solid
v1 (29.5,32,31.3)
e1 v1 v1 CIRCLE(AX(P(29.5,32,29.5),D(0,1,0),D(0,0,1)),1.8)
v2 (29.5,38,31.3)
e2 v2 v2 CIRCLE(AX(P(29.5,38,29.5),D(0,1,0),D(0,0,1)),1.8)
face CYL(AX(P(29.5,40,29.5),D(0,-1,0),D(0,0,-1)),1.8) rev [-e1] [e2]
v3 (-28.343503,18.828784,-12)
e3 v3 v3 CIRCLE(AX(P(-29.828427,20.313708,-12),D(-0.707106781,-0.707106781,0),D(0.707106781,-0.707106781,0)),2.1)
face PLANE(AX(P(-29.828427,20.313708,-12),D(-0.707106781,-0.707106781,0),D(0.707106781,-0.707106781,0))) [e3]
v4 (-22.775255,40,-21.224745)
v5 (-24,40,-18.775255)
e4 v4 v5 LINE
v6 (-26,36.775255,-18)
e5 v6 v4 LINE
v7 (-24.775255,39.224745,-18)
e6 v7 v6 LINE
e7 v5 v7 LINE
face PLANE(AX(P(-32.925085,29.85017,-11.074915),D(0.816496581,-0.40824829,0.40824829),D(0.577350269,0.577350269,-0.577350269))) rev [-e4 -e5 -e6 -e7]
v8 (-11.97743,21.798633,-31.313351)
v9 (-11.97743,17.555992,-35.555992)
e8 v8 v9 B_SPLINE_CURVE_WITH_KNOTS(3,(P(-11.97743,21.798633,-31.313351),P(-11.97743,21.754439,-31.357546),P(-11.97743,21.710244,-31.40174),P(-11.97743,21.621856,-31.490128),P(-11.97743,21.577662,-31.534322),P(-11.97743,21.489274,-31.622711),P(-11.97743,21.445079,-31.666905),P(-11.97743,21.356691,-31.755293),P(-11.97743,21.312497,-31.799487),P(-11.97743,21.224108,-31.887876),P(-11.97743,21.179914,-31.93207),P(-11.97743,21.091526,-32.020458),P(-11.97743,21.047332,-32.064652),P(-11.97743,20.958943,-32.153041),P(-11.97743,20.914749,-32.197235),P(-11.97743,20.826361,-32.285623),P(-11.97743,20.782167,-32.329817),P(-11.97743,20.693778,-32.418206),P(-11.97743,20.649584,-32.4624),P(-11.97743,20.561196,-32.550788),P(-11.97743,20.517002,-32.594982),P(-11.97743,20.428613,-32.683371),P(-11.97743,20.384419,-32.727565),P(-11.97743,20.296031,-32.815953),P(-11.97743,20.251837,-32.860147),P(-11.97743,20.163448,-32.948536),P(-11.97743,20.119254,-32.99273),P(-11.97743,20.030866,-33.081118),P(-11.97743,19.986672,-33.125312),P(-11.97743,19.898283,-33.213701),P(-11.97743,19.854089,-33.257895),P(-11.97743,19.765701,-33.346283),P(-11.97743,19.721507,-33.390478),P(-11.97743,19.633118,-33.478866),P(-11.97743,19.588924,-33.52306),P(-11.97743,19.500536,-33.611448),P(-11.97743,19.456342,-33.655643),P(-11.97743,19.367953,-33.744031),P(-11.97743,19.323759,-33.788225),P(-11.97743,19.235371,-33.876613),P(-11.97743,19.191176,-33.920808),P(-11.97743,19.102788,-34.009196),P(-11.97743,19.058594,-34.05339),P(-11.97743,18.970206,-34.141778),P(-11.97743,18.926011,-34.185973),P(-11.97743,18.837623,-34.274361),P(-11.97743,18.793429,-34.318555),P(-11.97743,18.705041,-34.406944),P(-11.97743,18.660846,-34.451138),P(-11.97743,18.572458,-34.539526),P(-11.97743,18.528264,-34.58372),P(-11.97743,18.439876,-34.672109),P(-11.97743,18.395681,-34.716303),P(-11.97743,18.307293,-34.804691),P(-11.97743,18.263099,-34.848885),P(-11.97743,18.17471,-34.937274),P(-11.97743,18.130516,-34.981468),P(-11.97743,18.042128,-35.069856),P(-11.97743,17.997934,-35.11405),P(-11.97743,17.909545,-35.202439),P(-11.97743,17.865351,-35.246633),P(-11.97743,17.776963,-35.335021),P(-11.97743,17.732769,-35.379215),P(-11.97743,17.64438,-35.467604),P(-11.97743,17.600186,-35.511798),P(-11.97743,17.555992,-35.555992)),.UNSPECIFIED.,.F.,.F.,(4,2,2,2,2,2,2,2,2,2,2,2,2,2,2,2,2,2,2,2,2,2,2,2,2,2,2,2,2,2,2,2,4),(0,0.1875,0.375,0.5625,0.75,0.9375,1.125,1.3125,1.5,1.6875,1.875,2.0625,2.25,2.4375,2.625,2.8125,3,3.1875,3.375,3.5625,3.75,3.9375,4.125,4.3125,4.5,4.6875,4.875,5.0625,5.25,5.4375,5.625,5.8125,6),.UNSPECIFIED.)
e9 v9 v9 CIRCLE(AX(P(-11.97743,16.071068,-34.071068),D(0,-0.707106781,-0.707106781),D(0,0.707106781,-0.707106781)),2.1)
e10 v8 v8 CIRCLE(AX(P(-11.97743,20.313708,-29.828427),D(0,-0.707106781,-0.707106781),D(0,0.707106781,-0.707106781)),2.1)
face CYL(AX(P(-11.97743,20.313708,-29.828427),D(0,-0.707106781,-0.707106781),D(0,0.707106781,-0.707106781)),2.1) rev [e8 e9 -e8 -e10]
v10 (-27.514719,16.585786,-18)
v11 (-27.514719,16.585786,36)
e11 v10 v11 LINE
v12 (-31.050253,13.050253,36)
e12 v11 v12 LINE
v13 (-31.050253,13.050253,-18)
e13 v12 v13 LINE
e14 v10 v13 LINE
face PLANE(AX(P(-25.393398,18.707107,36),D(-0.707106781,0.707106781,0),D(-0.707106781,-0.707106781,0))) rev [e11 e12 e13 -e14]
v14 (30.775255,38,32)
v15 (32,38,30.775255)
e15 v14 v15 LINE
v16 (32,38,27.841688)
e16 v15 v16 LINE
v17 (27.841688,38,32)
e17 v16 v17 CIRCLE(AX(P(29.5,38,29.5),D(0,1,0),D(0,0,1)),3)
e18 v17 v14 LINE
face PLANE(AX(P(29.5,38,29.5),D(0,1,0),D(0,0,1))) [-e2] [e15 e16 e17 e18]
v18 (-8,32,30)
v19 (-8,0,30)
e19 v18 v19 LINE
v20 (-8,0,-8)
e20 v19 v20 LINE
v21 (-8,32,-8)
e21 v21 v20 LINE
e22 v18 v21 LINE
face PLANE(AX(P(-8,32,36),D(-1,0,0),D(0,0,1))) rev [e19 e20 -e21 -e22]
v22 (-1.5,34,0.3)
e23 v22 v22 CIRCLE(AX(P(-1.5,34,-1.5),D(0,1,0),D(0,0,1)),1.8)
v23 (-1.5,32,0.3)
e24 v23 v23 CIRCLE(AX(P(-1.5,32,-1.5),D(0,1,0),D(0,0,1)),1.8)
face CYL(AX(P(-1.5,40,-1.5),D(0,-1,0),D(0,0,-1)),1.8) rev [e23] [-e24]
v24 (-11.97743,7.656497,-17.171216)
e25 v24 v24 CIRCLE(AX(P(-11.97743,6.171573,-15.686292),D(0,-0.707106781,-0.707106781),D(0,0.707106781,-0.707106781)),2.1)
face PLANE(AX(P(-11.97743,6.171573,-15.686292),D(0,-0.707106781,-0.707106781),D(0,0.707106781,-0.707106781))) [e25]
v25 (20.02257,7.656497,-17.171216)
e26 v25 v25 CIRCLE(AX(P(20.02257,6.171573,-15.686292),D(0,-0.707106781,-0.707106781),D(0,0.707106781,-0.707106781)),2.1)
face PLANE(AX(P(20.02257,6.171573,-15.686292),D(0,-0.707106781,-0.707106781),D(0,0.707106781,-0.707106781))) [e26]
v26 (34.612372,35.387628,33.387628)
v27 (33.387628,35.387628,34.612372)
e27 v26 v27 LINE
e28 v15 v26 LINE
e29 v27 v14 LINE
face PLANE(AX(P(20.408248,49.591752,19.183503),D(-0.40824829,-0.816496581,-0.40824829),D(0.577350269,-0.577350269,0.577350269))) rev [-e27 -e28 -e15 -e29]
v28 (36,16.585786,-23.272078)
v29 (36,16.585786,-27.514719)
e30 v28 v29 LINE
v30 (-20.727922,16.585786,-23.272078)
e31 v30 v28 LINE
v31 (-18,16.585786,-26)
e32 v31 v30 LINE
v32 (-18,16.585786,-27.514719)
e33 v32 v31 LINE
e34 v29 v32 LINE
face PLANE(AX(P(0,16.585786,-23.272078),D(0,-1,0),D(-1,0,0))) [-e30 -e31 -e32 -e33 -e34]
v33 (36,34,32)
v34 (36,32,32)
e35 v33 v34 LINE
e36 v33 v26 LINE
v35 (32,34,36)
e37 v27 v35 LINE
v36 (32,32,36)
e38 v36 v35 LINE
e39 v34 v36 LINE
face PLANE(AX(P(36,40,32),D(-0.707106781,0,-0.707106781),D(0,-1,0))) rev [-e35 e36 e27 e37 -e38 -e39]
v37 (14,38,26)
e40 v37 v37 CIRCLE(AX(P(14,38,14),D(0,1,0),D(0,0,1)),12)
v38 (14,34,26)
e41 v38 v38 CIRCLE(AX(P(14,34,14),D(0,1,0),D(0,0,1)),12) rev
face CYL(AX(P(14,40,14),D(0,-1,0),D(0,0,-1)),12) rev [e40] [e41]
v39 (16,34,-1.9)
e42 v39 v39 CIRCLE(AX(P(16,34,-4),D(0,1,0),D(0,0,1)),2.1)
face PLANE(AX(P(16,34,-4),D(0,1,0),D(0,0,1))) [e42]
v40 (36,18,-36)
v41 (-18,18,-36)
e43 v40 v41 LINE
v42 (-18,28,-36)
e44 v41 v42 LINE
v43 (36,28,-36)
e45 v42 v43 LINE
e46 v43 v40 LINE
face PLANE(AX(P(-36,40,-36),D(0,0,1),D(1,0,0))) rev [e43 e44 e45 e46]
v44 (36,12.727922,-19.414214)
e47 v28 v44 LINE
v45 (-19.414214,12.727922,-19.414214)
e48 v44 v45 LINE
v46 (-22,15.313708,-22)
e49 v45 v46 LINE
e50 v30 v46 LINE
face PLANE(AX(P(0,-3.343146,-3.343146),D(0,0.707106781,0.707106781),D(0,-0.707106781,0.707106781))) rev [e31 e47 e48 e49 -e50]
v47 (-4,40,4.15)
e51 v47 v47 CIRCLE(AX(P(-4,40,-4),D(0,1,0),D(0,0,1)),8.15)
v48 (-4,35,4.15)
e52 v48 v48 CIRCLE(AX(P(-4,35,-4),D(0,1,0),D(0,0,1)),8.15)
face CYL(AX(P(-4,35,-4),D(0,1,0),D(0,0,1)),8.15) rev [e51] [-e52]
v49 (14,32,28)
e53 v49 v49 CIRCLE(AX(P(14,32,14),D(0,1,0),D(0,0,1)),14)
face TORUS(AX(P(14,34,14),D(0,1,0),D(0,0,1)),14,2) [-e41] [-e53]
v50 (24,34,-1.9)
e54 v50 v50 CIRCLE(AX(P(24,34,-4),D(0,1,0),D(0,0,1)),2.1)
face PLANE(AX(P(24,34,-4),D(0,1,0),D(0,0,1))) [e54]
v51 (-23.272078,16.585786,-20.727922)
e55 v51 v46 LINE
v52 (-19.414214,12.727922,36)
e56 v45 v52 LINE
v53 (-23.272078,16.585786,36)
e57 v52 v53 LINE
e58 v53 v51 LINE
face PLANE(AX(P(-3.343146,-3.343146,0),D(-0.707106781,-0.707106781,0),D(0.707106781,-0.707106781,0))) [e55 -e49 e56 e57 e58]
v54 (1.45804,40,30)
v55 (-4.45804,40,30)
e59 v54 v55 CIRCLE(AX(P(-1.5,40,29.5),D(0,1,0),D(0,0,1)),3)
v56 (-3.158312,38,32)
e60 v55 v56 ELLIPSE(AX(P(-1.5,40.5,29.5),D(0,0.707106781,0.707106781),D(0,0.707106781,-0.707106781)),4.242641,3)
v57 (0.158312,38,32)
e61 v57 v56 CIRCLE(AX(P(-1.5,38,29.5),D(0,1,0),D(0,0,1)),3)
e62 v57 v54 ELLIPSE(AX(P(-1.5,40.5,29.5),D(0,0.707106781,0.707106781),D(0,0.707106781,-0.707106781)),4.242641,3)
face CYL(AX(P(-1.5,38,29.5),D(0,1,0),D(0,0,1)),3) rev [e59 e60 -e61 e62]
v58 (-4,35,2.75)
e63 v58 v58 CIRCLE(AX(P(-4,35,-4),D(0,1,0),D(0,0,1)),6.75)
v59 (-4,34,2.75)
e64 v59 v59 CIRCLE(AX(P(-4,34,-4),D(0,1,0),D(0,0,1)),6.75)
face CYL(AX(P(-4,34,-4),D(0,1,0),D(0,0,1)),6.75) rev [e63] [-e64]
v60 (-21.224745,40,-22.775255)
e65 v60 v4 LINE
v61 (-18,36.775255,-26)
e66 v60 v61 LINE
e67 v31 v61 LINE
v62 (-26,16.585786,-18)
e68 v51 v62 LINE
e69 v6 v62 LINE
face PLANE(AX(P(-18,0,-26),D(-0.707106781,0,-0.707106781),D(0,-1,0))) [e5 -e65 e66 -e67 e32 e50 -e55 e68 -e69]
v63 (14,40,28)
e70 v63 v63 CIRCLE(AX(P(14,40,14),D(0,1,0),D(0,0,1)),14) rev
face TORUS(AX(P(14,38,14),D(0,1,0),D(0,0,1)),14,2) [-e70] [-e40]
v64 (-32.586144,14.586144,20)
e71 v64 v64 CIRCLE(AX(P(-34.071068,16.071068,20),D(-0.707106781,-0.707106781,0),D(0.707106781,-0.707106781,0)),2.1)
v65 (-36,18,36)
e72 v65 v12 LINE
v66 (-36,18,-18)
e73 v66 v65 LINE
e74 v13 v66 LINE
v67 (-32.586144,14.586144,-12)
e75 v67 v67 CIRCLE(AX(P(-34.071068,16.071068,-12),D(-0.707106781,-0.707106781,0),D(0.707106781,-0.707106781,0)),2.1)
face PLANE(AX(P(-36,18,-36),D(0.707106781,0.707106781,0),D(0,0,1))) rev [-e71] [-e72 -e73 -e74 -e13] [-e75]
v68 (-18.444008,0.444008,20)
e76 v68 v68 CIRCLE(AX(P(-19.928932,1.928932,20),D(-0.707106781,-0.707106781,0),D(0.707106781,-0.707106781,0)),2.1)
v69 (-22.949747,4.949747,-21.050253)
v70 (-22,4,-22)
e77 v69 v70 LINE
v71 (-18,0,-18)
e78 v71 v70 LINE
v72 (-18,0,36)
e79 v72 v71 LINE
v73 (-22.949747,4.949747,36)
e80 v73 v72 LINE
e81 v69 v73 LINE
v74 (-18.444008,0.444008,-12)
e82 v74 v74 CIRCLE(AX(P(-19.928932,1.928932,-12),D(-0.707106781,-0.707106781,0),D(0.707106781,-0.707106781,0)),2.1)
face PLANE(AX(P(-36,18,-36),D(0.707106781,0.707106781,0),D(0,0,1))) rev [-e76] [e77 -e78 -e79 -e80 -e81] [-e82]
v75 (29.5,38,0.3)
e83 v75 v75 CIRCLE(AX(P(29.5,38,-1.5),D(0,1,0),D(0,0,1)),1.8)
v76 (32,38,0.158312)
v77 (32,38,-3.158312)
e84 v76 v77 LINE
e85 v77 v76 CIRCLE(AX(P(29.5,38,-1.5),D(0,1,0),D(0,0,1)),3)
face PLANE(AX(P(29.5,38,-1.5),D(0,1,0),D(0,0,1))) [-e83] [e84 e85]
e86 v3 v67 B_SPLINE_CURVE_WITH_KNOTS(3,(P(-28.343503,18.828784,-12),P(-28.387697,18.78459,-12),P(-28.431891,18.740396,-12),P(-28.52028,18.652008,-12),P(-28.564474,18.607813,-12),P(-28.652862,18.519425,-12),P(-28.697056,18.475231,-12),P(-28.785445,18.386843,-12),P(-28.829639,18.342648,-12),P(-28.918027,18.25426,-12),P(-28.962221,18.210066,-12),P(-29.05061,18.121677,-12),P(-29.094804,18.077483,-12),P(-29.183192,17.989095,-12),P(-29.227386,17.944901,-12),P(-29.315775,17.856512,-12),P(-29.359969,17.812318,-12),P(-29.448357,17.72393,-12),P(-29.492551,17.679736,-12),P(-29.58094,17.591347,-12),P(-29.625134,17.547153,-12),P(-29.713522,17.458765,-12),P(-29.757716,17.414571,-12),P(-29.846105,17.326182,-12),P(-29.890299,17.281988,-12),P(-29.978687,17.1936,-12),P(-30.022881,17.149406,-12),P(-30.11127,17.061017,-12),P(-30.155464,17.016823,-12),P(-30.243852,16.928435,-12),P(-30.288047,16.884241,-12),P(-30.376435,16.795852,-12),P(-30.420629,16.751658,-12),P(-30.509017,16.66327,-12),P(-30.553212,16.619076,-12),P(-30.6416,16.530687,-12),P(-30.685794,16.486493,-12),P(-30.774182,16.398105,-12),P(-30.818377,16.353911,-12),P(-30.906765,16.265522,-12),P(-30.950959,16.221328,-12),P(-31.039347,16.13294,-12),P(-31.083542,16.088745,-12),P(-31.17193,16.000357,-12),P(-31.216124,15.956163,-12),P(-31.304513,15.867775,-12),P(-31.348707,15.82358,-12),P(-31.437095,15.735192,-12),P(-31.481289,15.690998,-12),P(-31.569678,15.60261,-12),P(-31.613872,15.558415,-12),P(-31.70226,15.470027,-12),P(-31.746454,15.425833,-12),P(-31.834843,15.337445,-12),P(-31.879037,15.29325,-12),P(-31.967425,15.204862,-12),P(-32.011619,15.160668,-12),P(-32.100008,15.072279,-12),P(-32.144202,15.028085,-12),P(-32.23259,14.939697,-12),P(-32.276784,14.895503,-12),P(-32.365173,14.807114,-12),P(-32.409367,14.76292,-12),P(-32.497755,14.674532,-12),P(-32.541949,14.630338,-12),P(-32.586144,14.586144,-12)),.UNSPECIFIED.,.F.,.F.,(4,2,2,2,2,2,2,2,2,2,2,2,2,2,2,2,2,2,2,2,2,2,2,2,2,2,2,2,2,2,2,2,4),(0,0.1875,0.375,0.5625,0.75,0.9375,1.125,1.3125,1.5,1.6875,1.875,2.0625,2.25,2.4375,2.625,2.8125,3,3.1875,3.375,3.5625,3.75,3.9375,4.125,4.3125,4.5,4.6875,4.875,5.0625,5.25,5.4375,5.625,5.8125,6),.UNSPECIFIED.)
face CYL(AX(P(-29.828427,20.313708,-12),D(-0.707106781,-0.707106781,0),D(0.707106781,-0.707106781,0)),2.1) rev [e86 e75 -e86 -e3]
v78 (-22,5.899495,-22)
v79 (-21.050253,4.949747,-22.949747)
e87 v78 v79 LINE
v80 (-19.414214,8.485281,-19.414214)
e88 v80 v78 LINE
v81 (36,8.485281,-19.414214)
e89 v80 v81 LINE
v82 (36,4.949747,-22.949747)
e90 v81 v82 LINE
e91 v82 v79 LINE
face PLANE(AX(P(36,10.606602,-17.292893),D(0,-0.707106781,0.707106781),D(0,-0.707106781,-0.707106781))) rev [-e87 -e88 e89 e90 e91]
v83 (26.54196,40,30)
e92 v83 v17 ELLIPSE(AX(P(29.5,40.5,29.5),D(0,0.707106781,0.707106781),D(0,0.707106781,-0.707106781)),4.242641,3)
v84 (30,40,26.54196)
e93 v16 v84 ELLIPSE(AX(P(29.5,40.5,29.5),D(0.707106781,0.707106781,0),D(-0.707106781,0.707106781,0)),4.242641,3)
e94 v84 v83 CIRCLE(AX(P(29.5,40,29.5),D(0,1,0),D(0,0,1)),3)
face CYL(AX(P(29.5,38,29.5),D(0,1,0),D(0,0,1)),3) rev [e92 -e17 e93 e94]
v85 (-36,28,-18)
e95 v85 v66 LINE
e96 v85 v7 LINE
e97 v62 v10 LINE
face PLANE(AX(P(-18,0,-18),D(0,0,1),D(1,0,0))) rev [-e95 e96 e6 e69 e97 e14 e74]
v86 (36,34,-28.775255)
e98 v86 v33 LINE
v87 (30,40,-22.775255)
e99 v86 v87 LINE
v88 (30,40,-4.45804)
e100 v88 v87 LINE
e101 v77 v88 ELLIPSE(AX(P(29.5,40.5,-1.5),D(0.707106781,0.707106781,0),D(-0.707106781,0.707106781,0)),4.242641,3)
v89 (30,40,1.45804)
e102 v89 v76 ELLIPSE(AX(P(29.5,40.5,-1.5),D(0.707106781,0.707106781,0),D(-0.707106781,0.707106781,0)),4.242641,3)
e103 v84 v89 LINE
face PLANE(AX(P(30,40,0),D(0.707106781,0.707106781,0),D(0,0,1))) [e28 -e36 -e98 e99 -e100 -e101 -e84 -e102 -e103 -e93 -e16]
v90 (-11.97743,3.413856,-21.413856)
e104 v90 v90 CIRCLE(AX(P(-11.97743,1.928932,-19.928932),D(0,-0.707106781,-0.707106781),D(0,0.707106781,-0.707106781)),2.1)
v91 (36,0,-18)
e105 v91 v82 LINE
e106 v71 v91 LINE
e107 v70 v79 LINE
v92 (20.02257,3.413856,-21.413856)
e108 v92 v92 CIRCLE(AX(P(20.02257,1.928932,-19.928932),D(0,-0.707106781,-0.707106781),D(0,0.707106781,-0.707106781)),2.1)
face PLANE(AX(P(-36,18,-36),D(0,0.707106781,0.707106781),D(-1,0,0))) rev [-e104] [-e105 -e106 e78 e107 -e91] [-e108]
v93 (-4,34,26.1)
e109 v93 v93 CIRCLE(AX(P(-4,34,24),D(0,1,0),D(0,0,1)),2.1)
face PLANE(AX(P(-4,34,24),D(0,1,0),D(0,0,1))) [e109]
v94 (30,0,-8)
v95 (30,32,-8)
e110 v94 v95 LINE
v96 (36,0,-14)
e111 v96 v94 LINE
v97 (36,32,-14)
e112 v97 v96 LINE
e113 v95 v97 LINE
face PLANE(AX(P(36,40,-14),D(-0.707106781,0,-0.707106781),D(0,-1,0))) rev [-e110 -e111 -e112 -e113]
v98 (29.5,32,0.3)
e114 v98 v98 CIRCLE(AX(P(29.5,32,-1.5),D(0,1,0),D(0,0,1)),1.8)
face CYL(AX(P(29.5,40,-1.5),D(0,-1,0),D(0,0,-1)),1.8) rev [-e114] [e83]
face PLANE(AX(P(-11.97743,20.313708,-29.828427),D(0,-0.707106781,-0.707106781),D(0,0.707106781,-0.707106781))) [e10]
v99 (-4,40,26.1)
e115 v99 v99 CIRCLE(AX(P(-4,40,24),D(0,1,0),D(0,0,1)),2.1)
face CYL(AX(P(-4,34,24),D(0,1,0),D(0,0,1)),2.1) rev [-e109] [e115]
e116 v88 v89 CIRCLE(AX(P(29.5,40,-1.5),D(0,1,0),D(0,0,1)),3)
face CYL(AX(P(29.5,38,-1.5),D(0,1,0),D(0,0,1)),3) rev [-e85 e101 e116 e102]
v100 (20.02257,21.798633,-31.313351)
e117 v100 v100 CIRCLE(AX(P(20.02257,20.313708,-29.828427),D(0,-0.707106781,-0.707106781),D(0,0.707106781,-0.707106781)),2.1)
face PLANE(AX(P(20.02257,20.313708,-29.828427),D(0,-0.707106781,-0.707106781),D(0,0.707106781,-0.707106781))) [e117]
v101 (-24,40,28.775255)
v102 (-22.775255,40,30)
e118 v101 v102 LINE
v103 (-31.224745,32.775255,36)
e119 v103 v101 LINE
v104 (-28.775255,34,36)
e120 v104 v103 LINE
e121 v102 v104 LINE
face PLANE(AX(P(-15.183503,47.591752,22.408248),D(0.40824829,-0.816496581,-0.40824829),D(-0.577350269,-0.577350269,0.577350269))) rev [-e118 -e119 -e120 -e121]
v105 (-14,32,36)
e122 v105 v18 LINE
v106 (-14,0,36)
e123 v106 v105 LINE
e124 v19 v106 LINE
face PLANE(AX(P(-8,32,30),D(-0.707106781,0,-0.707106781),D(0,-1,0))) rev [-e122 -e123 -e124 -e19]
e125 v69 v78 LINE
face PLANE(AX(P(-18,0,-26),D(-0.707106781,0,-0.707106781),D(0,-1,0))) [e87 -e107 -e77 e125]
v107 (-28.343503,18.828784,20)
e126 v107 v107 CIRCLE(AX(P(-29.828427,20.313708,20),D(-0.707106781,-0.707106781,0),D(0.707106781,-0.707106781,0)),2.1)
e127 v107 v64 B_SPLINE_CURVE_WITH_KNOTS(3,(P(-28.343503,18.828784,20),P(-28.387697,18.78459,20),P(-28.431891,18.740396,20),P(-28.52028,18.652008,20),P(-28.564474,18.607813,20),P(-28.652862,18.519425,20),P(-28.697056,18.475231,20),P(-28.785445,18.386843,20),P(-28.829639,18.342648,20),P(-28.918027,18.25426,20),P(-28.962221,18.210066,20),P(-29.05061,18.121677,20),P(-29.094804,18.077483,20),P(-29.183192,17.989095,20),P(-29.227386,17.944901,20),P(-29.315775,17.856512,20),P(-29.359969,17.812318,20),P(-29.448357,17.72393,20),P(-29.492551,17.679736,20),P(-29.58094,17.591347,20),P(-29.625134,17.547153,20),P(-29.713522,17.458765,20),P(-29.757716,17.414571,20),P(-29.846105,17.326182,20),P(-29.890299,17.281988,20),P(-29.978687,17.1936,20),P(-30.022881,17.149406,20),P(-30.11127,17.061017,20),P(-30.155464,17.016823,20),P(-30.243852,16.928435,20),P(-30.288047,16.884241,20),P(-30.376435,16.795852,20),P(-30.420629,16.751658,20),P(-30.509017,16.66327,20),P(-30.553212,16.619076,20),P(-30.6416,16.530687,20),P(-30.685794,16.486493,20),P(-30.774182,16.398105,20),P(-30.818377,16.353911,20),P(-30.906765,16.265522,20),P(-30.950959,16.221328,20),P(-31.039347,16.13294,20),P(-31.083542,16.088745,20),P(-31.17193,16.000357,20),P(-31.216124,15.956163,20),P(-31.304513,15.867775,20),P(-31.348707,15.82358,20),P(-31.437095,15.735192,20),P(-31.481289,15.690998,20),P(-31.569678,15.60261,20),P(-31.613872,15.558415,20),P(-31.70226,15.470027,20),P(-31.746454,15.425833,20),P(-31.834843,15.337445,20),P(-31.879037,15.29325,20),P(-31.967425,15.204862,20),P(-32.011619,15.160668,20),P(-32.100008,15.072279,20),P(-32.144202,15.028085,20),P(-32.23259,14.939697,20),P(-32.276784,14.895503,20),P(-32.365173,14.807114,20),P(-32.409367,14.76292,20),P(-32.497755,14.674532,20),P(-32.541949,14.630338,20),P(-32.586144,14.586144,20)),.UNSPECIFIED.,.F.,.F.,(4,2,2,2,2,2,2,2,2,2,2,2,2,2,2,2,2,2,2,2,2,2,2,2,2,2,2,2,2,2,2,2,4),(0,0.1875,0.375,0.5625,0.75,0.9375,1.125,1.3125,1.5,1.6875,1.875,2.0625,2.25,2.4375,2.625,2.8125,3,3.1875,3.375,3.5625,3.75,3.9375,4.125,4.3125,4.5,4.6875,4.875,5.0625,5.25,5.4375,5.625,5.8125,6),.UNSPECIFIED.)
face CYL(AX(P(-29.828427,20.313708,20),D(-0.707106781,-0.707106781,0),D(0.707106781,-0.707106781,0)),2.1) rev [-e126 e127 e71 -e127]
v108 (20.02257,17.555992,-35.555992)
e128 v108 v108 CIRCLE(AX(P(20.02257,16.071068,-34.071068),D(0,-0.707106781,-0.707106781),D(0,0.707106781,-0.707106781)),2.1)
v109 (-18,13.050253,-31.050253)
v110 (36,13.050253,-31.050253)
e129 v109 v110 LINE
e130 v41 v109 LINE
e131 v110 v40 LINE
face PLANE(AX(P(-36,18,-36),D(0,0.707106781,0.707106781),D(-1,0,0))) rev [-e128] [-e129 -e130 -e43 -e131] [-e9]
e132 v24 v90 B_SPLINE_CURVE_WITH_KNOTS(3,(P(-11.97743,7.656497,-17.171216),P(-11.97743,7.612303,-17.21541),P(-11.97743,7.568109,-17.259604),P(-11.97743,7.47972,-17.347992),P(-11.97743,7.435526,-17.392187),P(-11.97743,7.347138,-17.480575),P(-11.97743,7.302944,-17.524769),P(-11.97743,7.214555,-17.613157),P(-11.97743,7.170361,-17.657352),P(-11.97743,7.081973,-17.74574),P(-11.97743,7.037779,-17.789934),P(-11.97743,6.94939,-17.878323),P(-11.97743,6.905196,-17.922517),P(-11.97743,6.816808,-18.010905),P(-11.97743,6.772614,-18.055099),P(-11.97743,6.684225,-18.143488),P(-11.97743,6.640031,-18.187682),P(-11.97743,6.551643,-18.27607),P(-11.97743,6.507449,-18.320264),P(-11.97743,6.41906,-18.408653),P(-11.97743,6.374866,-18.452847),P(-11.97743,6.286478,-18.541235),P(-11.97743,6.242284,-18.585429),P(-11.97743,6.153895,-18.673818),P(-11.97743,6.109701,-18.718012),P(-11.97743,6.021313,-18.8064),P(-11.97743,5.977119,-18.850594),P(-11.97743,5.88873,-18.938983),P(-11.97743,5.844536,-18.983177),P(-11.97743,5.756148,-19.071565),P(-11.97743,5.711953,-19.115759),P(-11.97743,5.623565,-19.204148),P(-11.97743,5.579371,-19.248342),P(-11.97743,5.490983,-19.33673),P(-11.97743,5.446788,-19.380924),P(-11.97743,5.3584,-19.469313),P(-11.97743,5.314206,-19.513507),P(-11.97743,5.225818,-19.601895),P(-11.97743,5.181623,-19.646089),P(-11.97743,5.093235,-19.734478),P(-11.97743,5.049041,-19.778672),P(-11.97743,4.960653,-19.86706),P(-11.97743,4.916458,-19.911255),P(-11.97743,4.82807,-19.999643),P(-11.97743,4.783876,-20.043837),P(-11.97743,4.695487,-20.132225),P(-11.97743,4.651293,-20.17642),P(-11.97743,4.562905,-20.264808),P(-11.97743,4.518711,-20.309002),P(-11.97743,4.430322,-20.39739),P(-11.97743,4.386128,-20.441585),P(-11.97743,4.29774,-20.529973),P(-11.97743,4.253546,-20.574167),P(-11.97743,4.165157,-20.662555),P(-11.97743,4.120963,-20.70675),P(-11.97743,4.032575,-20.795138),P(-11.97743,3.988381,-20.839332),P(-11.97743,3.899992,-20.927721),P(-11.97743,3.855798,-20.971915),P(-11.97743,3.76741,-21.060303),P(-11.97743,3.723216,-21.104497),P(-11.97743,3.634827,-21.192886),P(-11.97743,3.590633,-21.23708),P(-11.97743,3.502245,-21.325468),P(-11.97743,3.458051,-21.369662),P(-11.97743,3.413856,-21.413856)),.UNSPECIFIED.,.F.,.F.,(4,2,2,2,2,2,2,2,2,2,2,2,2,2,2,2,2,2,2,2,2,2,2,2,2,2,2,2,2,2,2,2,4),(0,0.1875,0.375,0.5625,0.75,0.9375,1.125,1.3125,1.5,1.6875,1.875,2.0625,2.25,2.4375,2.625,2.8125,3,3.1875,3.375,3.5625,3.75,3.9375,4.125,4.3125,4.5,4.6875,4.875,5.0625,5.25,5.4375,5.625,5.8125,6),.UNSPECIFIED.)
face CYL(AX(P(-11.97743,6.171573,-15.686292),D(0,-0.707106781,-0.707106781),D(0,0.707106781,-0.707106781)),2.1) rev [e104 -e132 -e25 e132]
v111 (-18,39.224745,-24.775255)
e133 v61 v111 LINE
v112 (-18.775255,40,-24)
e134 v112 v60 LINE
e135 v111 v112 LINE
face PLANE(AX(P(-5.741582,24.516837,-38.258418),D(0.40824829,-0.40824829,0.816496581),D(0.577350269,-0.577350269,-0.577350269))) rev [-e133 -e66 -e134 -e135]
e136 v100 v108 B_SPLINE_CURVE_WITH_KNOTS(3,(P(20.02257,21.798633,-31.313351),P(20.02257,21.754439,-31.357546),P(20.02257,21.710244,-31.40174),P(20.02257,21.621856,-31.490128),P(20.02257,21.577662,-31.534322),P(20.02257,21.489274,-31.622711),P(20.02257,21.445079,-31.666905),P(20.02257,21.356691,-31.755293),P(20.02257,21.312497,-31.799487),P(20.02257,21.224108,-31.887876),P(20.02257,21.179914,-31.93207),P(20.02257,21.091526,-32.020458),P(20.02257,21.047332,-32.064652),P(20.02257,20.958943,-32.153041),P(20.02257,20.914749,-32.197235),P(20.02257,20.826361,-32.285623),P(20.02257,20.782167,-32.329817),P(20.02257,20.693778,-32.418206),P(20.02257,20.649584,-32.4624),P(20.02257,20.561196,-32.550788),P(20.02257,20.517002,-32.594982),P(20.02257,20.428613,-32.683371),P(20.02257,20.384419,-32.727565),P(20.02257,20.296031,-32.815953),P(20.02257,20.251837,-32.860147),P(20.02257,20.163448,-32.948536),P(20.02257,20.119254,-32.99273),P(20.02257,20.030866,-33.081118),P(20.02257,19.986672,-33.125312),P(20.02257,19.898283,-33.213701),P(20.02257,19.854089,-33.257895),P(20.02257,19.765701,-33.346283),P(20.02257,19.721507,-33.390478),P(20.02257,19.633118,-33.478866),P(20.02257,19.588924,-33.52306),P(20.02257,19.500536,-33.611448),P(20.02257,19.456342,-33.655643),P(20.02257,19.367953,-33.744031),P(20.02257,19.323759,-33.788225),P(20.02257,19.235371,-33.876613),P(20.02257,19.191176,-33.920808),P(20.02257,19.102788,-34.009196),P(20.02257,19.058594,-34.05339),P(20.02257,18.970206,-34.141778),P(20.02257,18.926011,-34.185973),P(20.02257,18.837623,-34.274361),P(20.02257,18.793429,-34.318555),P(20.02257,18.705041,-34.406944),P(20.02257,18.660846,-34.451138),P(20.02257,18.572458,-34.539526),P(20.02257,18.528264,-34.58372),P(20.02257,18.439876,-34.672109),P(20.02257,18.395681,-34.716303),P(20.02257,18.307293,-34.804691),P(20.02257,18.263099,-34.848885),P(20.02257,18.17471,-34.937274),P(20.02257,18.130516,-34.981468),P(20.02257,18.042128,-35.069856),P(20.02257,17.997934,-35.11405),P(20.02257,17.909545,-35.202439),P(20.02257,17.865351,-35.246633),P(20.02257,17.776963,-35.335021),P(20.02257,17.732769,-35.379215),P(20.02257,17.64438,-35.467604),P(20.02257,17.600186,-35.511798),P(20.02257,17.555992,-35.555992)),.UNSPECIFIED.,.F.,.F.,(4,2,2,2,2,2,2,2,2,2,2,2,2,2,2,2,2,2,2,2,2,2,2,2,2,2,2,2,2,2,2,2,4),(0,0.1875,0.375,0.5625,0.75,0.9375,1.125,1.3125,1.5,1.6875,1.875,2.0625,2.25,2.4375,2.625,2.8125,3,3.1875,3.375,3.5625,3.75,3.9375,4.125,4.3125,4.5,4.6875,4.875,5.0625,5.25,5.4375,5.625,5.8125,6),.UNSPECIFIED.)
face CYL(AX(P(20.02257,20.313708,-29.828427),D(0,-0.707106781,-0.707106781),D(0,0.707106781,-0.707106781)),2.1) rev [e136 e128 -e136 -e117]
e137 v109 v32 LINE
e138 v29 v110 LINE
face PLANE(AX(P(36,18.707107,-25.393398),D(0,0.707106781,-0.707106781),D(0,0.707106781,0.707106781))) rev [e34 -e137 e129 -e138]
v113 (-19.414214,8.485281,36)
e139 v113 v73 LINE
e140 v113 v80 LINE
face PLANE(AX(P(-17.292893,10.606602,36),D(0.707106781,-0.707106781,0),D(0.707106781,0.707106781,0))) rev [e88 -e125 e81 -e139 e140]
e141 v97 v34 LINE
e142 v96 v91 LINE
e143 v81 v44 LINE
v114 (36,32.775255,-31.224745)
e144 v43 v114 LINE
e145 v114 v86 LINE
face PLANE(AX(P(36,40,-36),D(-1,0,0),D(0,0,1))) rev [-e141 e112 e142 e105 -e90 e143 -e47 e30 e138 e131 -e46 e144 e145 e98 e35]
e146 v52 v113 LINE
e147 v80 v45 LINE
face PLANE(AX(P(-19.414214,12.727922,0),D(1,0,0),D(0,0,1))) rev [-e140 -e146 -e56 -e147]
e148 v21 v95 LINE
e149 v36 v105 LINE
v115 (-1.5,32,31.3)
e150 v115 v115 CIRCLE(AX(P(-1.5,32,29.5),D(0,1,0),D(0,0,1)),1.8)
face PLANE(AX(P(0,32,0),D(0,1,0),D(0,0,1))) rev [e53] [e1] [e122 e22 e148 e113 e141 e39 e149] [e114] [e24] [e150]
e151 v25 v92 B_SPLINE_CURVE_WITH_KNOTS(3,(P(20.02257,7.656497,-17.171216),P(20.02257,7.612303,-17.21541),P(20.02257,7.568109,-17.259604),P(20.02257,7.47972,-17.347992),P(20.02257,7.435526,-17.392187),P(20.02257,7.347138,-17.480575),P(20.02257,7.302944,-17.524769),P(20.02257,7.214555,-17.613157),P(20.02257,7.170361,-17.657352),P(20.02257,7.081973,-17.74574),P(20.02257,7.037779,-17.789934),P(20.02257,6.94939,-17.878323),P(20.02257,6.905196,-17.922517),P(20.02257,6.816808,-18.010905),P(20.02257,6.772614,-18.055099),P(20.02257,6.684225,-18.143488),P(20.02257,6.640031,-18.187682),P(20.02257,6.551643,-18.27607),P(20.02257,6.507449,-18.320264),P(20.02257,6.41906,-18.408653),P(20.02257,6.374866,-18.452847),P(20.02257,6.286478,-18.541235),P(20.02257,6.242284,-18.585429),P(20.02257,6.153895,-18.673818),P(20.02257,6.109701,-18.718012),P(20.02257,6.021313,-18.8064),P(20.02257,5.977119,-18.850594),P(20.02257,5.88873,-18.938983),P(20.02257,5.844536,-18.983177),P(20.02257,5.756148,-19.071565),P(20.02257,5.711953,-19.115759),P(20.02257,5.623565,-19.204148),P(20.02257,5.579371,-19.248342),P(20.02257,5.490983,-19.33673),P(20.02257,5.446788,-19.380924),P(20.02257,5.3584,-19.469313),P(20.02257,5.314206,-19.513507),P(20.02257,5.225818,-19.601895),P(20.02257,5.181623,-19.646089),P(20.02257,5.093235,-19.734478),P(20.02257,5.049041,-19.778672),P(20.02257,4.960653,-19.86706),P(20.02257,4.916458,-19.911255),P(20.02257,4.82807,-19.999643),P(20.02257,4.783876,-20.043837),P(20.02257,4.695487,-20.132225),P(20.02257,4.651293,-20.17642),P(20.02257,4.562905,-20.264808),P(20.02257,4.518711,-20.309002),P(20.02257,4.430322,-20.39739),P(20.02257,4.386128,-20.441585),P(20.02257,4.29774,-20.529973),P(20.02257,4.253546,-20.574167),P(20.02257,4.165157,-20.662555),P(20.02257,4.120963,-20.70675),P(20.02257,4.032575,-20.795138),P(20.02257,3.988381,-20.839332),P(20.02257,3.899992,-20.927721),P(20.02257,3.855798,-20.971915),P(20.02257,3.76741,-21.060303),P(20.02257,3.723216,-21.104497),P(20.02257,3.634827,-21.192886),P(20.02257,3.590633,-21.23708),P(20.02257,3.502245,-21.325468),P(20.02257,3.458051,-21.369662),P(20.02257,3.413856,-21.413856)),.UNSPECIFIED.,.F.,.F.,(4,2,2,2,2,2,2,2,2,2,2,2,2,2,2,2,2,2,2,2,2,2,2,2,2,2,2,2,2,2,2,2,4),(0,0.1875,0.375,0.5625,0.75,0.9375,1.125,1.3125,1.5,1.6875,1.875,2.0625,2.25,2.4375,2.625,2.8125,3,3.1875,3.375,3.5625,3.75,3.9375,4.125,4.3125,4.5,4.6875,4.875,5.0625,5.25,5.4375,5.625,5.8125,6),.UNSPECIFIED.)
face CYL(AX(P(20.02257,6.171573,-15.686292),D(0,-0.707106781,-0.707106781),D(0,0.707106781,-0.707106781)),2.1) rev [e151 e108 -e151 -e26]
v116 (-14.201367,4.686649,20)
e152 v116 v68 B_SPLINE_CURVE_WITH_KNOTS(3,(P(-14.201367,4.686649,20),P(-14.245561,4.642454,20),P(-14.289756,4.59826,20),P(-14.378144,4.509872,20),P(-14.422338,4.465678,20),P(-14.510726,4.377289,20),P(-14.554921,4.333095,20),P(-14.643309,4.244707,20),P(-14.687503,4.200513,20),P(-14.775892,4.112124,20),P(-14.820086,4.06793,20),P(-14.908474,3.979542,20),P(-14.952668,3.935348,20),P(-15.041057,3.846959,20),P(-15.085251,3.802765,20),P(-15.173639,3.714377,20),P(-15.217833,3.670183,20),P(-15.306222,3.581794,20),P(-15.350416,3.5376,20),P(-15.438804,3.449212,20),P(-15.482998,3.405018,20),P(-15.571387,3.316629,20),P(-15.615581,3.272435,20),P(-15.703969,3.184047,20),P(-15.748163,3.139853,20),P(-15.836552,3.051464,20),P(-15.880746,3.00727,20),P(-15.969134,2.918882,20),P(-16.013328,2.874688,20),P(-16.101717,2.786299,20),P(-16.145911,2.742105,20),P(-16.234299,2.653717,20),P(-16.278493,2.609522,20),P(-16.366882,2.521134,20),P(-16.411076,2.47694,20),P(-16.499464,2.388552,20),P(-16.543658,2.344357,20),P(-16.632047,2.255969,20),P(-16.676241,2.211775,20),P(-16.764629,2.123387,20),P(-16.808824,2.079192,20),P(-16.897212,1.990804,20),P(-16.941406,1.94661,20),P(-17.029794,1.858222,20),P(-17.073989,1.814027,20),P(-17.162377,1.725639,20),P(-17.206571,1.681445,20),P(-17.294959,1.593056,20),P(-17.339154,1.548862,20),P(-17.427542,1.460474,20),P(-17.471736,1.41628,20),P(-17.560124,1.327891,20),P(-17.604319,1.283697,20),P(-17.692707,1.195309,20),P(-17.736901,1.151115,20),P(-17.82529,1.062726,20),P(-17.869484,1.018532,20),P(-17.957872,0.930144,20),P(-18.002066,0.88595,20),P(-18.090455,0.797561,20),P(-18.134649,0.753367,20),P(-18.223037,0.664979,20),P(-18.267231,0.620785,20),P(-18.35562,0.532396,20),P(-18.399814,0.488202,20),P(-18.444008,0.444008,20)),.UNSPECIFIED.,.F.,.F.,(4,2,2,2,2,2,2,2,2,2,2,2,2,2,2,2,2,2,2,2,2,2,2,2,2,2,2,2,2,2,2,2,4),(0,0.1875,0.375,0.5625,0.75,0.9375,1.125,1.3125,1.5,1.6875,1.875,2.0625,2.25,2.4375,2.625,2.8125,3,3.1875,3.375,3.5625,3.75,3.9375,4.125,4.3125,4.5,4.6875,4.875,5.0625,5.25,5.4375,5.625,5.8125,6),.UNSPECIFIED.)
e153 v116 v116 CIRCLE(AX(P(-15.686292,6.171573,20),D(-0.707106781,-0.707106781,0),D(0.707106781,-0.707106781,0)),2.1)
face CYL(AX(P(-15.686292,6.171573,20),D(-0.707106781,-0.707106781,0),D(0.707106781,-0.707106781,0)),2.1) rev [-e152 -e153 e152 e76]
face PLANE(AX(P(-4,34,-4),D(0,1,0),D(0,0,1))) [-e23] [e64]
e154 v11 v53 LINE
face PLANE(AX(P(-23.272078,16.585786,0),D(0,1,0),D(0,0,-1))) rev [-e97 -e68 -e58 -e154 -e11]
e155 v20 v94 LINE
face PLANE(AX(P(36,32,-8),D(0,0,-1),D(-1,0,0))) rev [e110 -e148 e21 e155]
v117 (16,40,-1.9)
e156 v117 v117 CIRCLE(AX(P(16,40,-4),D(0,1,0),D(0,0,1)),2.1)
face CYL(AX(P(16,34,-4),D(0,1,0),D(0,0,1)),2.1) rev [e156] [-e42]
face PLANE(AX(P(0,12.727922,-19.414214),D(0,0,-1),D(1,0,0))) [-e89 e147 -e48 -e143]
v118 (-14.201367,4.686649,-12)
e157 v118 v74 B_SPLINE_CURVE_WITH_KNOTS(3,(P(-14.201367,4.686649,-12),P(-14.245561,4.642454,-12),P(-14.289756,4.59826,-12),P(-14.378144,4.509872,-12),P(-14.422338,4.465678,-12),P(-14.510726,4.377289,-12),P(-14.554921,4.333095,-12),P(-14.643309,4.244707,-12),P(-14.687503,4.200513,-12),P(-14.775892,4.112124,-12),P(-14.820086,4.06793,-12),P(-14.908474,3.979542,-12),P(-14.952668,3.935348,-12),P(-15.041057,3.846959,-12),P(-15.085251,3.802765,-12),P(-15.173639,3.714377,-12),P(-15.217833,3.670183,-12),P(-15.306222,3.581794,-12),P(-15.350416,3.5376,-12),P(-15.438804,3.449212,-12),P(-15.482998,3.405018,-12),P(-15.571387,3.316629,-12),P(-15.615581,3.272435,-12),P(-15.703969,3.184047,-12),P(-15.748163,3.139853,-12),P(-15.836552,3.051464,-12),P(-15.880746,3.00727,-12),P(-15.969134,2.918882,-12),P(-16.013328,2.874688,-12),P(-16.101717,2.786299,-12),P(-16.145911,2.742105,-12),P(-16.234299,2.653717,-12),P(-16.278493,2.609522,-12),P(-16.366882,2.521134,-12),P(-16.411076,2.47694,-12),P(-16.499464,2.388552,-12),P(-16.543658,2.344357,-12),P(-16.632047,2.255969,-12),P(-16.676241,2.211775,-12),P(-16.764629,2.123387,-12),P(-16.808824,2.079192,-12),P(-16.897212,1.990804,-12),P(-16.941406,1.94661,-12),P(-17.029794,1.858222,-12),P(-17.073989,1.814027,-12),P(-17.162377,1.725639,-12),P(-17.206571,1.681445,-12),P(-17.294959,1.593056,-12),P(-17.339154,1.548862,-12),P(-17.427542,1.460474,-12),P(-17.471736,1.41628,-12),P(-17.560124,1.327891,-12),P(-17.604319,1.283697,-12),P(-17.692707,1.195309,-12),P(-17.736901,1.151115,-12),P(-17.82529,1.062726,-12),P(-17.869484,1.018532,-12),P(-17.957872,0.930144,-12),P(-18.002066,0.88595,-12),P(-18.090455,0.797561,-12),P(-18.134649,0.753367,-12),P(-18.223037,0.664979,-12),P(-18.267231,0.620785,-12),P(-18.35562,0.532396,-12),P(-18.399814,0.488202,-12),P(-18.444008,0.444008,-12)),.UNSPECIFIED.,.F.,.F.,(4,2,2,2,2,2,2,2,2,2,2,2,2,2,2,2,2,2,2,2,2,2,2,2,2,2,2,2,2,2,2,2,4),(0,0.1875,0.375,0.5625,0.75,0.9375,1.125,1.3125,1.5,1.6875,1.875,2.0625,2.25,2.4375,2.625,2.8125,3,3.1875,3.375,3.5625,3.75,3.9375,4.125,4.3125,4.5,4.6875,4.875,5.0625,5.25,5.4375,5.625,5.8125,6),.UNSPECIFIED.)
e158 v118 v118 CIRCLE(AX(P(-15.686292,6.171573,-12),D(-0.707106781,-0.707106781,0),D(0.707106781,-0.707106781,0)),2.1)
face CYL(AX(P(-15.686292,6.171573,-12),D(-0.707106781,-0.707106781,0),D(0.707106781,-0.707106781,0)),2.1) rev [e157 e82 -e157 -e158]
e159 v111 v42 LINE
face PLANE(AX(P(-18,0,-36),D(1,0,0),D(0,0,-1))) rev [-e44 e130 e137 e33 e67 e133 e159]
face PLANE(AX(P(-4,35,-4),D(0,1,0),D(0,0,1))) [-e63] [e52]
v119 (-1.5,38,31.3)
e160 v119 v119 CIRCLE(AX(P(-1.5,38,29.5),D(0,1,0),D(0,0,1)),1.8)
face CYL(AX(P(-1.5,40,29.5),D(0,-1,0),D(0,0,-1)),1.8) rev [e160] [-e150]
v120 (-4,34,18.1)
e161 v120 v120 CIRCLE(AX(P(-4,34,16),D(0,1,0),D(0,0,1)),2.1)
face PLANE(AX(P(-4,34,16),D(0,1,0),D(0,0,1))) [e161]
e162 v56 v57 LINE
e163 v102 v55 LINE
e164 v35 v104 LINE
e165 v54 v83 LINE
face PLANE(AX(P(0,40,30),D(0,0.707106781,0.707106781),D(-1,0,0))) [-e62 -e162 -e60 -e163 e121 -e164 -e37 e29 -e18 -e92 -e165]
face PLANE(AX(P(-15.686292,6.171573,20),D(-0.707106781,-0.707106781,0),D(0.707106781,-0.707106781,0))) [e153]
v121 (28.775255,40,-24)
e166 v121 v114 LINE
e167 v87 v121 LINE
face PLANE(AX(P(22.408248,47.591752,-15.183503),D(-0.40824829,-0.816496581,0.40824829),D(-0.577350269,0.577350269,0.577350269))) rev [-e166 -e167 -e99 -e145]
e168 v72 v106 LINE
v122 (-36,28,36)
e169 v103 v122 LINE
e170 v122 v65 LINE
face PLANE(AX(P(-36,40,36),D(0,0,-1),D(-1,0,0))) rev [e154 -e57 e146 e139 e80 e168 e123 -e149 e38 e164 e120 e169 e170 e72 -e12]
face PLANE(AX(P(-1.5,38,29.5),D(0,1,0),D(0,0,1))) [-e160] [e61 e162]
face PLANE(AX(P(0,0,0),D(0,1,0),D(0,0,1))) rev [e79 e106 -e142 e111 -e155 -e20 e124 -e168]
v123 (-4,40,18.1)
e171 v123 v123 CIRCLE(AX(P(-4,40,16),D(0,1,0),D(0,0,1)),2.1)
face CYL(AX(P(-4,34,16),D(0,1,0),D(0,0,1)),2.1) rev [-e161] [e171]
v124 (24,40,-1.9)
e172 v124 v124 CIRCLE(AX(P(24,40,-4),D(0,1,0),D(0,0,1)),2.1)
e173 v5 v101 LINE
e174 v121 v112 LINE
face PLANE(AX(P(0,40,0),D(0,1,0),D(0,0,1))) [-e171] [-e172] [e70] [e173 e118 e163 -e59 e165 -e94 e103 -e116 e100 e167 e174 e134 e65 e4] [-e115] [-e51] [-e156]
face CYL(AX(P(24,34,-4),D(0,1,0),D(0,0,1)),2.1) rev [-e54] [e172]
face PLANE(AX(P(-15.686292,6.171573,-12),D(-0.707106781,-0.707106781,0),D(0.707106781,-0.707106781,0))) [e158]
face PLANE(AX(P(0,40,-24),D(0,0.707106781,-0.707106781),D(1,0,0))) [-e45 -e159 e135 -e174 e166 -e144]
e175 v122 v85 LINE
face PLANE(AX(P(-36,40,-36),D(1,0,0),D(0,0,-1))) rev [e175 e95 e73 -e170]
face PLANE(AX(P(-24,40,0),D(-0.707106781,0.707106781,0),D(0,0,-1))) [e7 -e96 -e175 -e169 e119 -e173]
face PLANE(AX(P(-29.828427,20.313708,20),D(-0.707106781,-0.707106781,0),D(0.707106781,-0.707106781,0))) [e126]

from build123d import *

# Parameters (mm, degrees)
SKETCH1_W           = 72
SKETCH1_H           = 72
SKETCH1_R           = 12
SKETCH1_R_2         = 1.8
BOSS_EXTRUDE1_DEPTH = 40
SKETCH6_W           = 44
SKETCH6_H           = 44
CUT_EXTRUDE1_DEPTH  = 32
CHAMFER1_SIZE       = 18
SKETCH7_W           = 18
SKETCH7_H           = 18
CUT_EXTRUDE2_DEPTH  = 65.745656225
CHAMFER2_SIZE       = 8
CHAMFER3_SIZE       = 4
SKETCH8_R           = 3
CUT_EXTRUDE3_DEPTH  = 2
CHAMFER5_SIZE       = 6
CHAMFER6_SIZE       = 6
CHAMFER7_SIZE       = 12
SKETCH9_R           = 2.1
CUT_EXTRUDE4_DEPTH  = 6
SKETCH10_R          = 2.1
CUT_EXTRUDE5_DEPTH  = 6
SKETCH11_R          = 8.15
CUT_EXTRUDE6_DEPTH  = 5
FILLET1_R           = 2
SKETCH13_R          = 6.75
CUT_EXTRUDE7_DEPTH  = 1
SKETCH15_R          = 2.1
CUT_EXTRUDE8_DEPTH  = 6
CHAMFER8_SIZE       = 1
SKETCH16_W          = 11.455844123
SKETCH16_H          = 76.568397014
CUT_EXTRUDE9_DEPTH  = 8
SKETCH17_W          = 86.001258557
SKETCH17_H          = 11.455844123
CUT_EXTRUDE10_DEPTH = 8
CHAMFER9_SIZE       = 3


with BuildPart() as part:
    # Sketch1 → Boss-Extrude1 (new body)
    with BuildSketch(Plane(origin=(0, 0, 0), x_dir=(1, 0, 0), z_dir=(0, 1, 0))):
        Rectangle(SKETCH1_W, SKETCH1_H)
        with Locations(Location((14, -14, 0), (0, 0, 270))):
            Circle(SKETCH1_R, mode=Mode.SUBTRACT)
        with Locations(Location((29.5, 1.5, 0), (0, 0, 270))):
            Circle(SKETCH1_R_2, mode=Mode.SUBTRACT)
        with Locations(Location((29.5, -29.5, 0), (0, 0, 270))):
            Circle(SKETCH1_R_2, mode=Mode.SUBTRACT)
        with Locations(Location((-1.5, -29.5, 0), (0, 0, 270))):
            Circle(SKETCH1_R_2, mode=Mode.SUBTRACT)
        with Locations(Location((-1.5, 1.5, 0), (0, 0, 270))):
            Circle(SKETCH1_R_2, mode=Mode.SUBTRACT)
    extrude(amount=BOSS_EXTRUDE1_DEPTH)

    # Sketch6 → Cut-Extrude1 (cut)
    with BuildSketch(Plane(origin=(0, 0, 0), x_dir=(-1, 0, 0), z_dir=(0, -1, 0))):
        with Locations((-14, -14)):
            Rectangle(SKETCH6_W, SKETCH6_H)
    extrude(amount=-CUT_EXTRUDE1_DEPTH, mode=Mode.SUBTRACT)

    # Chamfer1
    chamfer1_edges = [part.edges().sort_by_distance(p)[0] for p in [
        (-36, 0, 0),
        (0, 0, -36),
        (-36, 20, -36),
    ]]
    chamfer(chamfer1_edges, length=CHAMFER1_SIZE)

    # Sketch7 → Cut-Extrude2 (cut, through all)
    with BuildSketch(Plane(origin=(0, 40, 0), x_dir=(1, 0, 0), z_dir=(0, 1, 0))):
        with Locations((-27, 27)):
            Rectangle(SKETCH7_W, SKETCH7_H)
    extrude(amount=-CUT_EXTRUDE2_DEPTH, mode=Mode.SUBTRACT)

    # Chamfer2
    # the kernel refuses this chamfer: 8 mm, written as the material it adds along each edge
    with BuildSketch(Plane(origin=(-18, 40, -18), x_dir=(0.027495876610586487, 0, -0.9996219169112968), z_dir=(0, -1, 0))) as chamfer2_piece_1_section:
        Polygon((CHAMFER2_SIZE * 0.999621916911, -CHAMFER2_SIZE * 0.0274958766106), (-CHAMFER2_SIZE * 0.0274958766106, -CHAMFER2_SIZE * 0.999621916911), (0, 0), align=None)
    chamfer2_piece_1 = extrude(amount=60.573463904, mode=Mode.PRIVATE)
    chamfer2_piece_1 = split(chamfer2_piece_1, bisect_by=Plane(origin=(-20.597865647, 12.296786874, -30.296786874), z_dir=(0, 0.7071067811865476, 0.7071067811865476)), keep=Keep.TOP, mode=Mode.PRIVATE)
    chamfer2_piece_1 = split(chamfer2_piece_1, bisect_by=Plane(origin=(-30.296786874, 12.296786874, -20.597865647), z_dir=(0.7071067811865476, 0.7071067811865476, 0)), keep=Keep.TOP, mode=Mode.PRIVATE)
    add(chamfer2_piece_1)

    # Chamfer3
    chamfer3_edges = [part.edges().sort_by_distance(p)[0] for p in [
        (36, 36, 36),
    ]]
    chamfer(chamfer3_edges, length=CHAMFER3_SIZE)

    # Sketch8 → Cut-Extrude3 (cut)
    with BuildSketch(Plane(origin=(0, 40, 0), x_dir=(1, 0, 0), z_dir=(0, 1, 0))):
        with Locations(Location((-1.5, 1.5, 0), (0, 0, 270))):
            Circle(SKETCH8_R)
        with Locations(Location((29.5, 1.5, 0), (0, 0, 270))):
            Circle(SKETCH8_R)
        with Locations(Location((29.5, -29.5, 0), (0, 0, 270))):
            Circle(SKETCH8_R)
        with Locations(Location((-1.5, -29.5, 0), (0, 0, 270))):
            Circle(SKETCH8_R)
    extrude(amount=-CUT_EXTRUDE3_DEPTH, mode=Mode.SUBTRACT)

    # Chamfer5
    chamfer5_edges = [part.edges().sort_by_distance(p)[0] for p in [
        (36, 16, -8),
        (-8, 16, 36),
    ]]
    chamfer(chamfer5_edges, length=CHAMFER5_SIZE)

    # Chamfer6
    # the kernel refuses this chamfer: 6 mm, written as the material it takes off along each edge
    with BuildSketch(Plane(origin=(36, 40, -51.430097928), x_dir=(0.027495876610586768, -0.9996219169112968, 0), z_dir=(0, 0, 1)), Plane(origin=(47.430097928, 40, 36), x_dir=(0, -0.9996219169112965, 0.02749587661058676), z_dir=(-1, 0, 0))) as chamfer6_piece_1:
        Polygon((CHAMFER6_SIZE * 0.999621916911, -CHAMFER6_SIZE * 0.0274958766106), (-CHAMFER6_SIZE * 0.0274958766106, -CHAMFER6_SIZE * 0.999621916911), (0, 0), align=None)
    extrude(amount=98.860195856, mode=Mode.SUBTRACT)

    # Chamfer7
    chamfer7_edges = [part.edges().sort_by_distance(p)[0] for p in [
        (6, 40, -36),
        (-36, 40, 6),
    ]]
    chamfer(chamfer7_edges, length=CHAMFER7_SIZE)

    # Sketch9 → Cut-Extrude4 (cut)
    with BuildSketch(Plane(origin=(0, -9, -9), x_dir=(-1, 0, 0), z_dir=(0, -0.7071067811865488, -0.7071067811865464))):
        with Locations(Location((11.977430497, 15.455844123, 0), (0, 0, 90))):
            Circle(SKETCH9_R)
        with Locations(Location((-20.022569503, 15.455844123, 0), (0, 0, 90))):
            Circle(SKETCH9_R)
        with Locations(Location((-20.022569503, 35.455844123, 0), (0, 0, 90))):
            Circle(SKETCH9_R)
        with Locations(Location((11.977430497, 35.455844123, 0), (0, 0, 90))):
            Circle(SKETCH9_R)
    extrude(amount=-CUT_EXTRUDE4_DEPTH, mode=Mode.SUBTRACT)

    # Sketch10 → Cut-Extrude5 (cut)
    with BuildSketch(Plane(origin=(-9, -9, 0), x_dir=(-0.7071067811865488, 0.7071067811865464, 0), z_dir=(-0.7071067811865464, -0.7071067811865488, 0))):
        with Locations(Location((35.455844123, 12, 0), (0, 0, 180))):
            Circle(SKETCH10_R)
        with Locations(Location((35.455844123, -20, 0), (0, 0, 180))):
            Circle(SKETCH10_R)
        with Locations(Location((15.455844123, -20, 0), (0, 0, 180))):
            Circle(SKETCH10_R)
        with Locations(Location((15.455844123, 12, 0), (0, 0, 180))):
            Circle(SKETCH10_R)
    extrude(amount=-CUT_EXTRUDE5_DEPTH, mode=Mode.SUBTRACT)

    # Sketch11 → Cut-Extrude6 (cut)
    with BuildSketch(Plane(origin=(0, 40, 0), x_dir=(1, 0, 0), z_dir=(0, 1, 0))):
        with Locations(Location((-4, 4, 0), (0, 0, 270))):
            Circle(SKETCH11_R)
    extrude(amount=-CUT_EXTRUDE6_DEPTH, mode=Mode.SUBTRACT)

    # Fillet1
    fillet1_edges = [part.edges().sort_by_distance(p)[0] for p in [
        (14, 40, 2),
        (14, 32, 2),
    ]]
    fillet(fillet1_edges, radius=FILLET1_R)

    # Sketch13 → Cut-Extrude7 (cut)
    with BuildSketch(Plane(origin=(0, 35, 0), x_dir=(1, 0, 0), z_dir=(0, 1, 0))):
        with Locations(Location((-4, 4, 0), (0, 0, 270))):
            Circle(SKETCH13_R)
    extrude(amount=-CUT_EXTRUDE7_DEPTH, mode=Mode.SUBTRACT)

    # Sketch15 → Cut-Extrude8 (cut)
    with BuildSketch(Plane(origin=(0, 40, 0), x_dir=(1, 0, 0), z_dir=(0, 1, 0))):
        with Locations(Location((16, 4, 0), (0, 0, 270))):
            Circle(SKETCH15_R)
        with Locations(Location((24, 4, 0), (0, 0, 270))):
            Circle(SKETCH15_R)
        with Locations(Location((-4, -16, 0), (0, 0, 270))):
            Circle(SKETCH15_R)
        with Locations(Location((-4, -24, 0), (0, 0, 270))):
            Circle(SKETCH15_R)
    extrude(amount=-CUT_EXTRUDE8_DEPTH, mode=Mode.SUBTRACT)

    # Chamfer8
    chamfer8_edges = [part.edges().sort_by_distance(p)[0] for p in [
        (-25, 39, -19),
        (-19, 39, -25),
        (33, 37, -27),
        (32.810660172, 37.189339828, 32.810660172),
        (-27, 37, 33),
    ]]
    chamfer(chamfer8_edges, length=CHAMFER8_SIZE)

    # Sketch16 → Cut-Extrude9 (cut)
    with BuildSketch(Plane(origin=(-9, -9, 0), x_dir=(-0.7071067811865488, 0.7071067811865464, 0), z_dir=(-0.7071067811865464, -0.7071067811865488, 0))):
        with Locations((25.455844123, 2.284198507)):
            Rectangle(SKETCH16_W, SKETCH16_H)
    extrude(amount=-CUT_EXTRUDE9_DEPTH, mode=Mode.SUBTRACT)

    # Sketch17 → Cut-Extrude10 (cut)
    with BuildSketch(Plane(origin=(0, -9, -9), x_dir=(-1, 0, 0), z_dir=(0, -0.7071067811865488, -0.7071067811865464))):
        with Locations((7.000629278, 25.455844123)):
            Rectangle(SKETCH17_W, SKETCH17_H)
    extrude(amount=-CUT_EXTRUDE10_DEPTH, mode=Mode.SUBTRACT)

    # Chamfer9
    chamfer9_edges = [part.edges().sort_by_distance(p)[0] for p in [
        (8.696699141, 18.707106781, -25.393398282),
        (-25.393398282, 18.707106781, 8.696699141),
        (9.353553391, 10.606601718, -17.292893219),
        (-17.292893219, 10.606601718, 9.353553391),
    ]]
    chamfer(chamfer9_edges, length=CHAMFER9_SIZE)


solid = part.part
